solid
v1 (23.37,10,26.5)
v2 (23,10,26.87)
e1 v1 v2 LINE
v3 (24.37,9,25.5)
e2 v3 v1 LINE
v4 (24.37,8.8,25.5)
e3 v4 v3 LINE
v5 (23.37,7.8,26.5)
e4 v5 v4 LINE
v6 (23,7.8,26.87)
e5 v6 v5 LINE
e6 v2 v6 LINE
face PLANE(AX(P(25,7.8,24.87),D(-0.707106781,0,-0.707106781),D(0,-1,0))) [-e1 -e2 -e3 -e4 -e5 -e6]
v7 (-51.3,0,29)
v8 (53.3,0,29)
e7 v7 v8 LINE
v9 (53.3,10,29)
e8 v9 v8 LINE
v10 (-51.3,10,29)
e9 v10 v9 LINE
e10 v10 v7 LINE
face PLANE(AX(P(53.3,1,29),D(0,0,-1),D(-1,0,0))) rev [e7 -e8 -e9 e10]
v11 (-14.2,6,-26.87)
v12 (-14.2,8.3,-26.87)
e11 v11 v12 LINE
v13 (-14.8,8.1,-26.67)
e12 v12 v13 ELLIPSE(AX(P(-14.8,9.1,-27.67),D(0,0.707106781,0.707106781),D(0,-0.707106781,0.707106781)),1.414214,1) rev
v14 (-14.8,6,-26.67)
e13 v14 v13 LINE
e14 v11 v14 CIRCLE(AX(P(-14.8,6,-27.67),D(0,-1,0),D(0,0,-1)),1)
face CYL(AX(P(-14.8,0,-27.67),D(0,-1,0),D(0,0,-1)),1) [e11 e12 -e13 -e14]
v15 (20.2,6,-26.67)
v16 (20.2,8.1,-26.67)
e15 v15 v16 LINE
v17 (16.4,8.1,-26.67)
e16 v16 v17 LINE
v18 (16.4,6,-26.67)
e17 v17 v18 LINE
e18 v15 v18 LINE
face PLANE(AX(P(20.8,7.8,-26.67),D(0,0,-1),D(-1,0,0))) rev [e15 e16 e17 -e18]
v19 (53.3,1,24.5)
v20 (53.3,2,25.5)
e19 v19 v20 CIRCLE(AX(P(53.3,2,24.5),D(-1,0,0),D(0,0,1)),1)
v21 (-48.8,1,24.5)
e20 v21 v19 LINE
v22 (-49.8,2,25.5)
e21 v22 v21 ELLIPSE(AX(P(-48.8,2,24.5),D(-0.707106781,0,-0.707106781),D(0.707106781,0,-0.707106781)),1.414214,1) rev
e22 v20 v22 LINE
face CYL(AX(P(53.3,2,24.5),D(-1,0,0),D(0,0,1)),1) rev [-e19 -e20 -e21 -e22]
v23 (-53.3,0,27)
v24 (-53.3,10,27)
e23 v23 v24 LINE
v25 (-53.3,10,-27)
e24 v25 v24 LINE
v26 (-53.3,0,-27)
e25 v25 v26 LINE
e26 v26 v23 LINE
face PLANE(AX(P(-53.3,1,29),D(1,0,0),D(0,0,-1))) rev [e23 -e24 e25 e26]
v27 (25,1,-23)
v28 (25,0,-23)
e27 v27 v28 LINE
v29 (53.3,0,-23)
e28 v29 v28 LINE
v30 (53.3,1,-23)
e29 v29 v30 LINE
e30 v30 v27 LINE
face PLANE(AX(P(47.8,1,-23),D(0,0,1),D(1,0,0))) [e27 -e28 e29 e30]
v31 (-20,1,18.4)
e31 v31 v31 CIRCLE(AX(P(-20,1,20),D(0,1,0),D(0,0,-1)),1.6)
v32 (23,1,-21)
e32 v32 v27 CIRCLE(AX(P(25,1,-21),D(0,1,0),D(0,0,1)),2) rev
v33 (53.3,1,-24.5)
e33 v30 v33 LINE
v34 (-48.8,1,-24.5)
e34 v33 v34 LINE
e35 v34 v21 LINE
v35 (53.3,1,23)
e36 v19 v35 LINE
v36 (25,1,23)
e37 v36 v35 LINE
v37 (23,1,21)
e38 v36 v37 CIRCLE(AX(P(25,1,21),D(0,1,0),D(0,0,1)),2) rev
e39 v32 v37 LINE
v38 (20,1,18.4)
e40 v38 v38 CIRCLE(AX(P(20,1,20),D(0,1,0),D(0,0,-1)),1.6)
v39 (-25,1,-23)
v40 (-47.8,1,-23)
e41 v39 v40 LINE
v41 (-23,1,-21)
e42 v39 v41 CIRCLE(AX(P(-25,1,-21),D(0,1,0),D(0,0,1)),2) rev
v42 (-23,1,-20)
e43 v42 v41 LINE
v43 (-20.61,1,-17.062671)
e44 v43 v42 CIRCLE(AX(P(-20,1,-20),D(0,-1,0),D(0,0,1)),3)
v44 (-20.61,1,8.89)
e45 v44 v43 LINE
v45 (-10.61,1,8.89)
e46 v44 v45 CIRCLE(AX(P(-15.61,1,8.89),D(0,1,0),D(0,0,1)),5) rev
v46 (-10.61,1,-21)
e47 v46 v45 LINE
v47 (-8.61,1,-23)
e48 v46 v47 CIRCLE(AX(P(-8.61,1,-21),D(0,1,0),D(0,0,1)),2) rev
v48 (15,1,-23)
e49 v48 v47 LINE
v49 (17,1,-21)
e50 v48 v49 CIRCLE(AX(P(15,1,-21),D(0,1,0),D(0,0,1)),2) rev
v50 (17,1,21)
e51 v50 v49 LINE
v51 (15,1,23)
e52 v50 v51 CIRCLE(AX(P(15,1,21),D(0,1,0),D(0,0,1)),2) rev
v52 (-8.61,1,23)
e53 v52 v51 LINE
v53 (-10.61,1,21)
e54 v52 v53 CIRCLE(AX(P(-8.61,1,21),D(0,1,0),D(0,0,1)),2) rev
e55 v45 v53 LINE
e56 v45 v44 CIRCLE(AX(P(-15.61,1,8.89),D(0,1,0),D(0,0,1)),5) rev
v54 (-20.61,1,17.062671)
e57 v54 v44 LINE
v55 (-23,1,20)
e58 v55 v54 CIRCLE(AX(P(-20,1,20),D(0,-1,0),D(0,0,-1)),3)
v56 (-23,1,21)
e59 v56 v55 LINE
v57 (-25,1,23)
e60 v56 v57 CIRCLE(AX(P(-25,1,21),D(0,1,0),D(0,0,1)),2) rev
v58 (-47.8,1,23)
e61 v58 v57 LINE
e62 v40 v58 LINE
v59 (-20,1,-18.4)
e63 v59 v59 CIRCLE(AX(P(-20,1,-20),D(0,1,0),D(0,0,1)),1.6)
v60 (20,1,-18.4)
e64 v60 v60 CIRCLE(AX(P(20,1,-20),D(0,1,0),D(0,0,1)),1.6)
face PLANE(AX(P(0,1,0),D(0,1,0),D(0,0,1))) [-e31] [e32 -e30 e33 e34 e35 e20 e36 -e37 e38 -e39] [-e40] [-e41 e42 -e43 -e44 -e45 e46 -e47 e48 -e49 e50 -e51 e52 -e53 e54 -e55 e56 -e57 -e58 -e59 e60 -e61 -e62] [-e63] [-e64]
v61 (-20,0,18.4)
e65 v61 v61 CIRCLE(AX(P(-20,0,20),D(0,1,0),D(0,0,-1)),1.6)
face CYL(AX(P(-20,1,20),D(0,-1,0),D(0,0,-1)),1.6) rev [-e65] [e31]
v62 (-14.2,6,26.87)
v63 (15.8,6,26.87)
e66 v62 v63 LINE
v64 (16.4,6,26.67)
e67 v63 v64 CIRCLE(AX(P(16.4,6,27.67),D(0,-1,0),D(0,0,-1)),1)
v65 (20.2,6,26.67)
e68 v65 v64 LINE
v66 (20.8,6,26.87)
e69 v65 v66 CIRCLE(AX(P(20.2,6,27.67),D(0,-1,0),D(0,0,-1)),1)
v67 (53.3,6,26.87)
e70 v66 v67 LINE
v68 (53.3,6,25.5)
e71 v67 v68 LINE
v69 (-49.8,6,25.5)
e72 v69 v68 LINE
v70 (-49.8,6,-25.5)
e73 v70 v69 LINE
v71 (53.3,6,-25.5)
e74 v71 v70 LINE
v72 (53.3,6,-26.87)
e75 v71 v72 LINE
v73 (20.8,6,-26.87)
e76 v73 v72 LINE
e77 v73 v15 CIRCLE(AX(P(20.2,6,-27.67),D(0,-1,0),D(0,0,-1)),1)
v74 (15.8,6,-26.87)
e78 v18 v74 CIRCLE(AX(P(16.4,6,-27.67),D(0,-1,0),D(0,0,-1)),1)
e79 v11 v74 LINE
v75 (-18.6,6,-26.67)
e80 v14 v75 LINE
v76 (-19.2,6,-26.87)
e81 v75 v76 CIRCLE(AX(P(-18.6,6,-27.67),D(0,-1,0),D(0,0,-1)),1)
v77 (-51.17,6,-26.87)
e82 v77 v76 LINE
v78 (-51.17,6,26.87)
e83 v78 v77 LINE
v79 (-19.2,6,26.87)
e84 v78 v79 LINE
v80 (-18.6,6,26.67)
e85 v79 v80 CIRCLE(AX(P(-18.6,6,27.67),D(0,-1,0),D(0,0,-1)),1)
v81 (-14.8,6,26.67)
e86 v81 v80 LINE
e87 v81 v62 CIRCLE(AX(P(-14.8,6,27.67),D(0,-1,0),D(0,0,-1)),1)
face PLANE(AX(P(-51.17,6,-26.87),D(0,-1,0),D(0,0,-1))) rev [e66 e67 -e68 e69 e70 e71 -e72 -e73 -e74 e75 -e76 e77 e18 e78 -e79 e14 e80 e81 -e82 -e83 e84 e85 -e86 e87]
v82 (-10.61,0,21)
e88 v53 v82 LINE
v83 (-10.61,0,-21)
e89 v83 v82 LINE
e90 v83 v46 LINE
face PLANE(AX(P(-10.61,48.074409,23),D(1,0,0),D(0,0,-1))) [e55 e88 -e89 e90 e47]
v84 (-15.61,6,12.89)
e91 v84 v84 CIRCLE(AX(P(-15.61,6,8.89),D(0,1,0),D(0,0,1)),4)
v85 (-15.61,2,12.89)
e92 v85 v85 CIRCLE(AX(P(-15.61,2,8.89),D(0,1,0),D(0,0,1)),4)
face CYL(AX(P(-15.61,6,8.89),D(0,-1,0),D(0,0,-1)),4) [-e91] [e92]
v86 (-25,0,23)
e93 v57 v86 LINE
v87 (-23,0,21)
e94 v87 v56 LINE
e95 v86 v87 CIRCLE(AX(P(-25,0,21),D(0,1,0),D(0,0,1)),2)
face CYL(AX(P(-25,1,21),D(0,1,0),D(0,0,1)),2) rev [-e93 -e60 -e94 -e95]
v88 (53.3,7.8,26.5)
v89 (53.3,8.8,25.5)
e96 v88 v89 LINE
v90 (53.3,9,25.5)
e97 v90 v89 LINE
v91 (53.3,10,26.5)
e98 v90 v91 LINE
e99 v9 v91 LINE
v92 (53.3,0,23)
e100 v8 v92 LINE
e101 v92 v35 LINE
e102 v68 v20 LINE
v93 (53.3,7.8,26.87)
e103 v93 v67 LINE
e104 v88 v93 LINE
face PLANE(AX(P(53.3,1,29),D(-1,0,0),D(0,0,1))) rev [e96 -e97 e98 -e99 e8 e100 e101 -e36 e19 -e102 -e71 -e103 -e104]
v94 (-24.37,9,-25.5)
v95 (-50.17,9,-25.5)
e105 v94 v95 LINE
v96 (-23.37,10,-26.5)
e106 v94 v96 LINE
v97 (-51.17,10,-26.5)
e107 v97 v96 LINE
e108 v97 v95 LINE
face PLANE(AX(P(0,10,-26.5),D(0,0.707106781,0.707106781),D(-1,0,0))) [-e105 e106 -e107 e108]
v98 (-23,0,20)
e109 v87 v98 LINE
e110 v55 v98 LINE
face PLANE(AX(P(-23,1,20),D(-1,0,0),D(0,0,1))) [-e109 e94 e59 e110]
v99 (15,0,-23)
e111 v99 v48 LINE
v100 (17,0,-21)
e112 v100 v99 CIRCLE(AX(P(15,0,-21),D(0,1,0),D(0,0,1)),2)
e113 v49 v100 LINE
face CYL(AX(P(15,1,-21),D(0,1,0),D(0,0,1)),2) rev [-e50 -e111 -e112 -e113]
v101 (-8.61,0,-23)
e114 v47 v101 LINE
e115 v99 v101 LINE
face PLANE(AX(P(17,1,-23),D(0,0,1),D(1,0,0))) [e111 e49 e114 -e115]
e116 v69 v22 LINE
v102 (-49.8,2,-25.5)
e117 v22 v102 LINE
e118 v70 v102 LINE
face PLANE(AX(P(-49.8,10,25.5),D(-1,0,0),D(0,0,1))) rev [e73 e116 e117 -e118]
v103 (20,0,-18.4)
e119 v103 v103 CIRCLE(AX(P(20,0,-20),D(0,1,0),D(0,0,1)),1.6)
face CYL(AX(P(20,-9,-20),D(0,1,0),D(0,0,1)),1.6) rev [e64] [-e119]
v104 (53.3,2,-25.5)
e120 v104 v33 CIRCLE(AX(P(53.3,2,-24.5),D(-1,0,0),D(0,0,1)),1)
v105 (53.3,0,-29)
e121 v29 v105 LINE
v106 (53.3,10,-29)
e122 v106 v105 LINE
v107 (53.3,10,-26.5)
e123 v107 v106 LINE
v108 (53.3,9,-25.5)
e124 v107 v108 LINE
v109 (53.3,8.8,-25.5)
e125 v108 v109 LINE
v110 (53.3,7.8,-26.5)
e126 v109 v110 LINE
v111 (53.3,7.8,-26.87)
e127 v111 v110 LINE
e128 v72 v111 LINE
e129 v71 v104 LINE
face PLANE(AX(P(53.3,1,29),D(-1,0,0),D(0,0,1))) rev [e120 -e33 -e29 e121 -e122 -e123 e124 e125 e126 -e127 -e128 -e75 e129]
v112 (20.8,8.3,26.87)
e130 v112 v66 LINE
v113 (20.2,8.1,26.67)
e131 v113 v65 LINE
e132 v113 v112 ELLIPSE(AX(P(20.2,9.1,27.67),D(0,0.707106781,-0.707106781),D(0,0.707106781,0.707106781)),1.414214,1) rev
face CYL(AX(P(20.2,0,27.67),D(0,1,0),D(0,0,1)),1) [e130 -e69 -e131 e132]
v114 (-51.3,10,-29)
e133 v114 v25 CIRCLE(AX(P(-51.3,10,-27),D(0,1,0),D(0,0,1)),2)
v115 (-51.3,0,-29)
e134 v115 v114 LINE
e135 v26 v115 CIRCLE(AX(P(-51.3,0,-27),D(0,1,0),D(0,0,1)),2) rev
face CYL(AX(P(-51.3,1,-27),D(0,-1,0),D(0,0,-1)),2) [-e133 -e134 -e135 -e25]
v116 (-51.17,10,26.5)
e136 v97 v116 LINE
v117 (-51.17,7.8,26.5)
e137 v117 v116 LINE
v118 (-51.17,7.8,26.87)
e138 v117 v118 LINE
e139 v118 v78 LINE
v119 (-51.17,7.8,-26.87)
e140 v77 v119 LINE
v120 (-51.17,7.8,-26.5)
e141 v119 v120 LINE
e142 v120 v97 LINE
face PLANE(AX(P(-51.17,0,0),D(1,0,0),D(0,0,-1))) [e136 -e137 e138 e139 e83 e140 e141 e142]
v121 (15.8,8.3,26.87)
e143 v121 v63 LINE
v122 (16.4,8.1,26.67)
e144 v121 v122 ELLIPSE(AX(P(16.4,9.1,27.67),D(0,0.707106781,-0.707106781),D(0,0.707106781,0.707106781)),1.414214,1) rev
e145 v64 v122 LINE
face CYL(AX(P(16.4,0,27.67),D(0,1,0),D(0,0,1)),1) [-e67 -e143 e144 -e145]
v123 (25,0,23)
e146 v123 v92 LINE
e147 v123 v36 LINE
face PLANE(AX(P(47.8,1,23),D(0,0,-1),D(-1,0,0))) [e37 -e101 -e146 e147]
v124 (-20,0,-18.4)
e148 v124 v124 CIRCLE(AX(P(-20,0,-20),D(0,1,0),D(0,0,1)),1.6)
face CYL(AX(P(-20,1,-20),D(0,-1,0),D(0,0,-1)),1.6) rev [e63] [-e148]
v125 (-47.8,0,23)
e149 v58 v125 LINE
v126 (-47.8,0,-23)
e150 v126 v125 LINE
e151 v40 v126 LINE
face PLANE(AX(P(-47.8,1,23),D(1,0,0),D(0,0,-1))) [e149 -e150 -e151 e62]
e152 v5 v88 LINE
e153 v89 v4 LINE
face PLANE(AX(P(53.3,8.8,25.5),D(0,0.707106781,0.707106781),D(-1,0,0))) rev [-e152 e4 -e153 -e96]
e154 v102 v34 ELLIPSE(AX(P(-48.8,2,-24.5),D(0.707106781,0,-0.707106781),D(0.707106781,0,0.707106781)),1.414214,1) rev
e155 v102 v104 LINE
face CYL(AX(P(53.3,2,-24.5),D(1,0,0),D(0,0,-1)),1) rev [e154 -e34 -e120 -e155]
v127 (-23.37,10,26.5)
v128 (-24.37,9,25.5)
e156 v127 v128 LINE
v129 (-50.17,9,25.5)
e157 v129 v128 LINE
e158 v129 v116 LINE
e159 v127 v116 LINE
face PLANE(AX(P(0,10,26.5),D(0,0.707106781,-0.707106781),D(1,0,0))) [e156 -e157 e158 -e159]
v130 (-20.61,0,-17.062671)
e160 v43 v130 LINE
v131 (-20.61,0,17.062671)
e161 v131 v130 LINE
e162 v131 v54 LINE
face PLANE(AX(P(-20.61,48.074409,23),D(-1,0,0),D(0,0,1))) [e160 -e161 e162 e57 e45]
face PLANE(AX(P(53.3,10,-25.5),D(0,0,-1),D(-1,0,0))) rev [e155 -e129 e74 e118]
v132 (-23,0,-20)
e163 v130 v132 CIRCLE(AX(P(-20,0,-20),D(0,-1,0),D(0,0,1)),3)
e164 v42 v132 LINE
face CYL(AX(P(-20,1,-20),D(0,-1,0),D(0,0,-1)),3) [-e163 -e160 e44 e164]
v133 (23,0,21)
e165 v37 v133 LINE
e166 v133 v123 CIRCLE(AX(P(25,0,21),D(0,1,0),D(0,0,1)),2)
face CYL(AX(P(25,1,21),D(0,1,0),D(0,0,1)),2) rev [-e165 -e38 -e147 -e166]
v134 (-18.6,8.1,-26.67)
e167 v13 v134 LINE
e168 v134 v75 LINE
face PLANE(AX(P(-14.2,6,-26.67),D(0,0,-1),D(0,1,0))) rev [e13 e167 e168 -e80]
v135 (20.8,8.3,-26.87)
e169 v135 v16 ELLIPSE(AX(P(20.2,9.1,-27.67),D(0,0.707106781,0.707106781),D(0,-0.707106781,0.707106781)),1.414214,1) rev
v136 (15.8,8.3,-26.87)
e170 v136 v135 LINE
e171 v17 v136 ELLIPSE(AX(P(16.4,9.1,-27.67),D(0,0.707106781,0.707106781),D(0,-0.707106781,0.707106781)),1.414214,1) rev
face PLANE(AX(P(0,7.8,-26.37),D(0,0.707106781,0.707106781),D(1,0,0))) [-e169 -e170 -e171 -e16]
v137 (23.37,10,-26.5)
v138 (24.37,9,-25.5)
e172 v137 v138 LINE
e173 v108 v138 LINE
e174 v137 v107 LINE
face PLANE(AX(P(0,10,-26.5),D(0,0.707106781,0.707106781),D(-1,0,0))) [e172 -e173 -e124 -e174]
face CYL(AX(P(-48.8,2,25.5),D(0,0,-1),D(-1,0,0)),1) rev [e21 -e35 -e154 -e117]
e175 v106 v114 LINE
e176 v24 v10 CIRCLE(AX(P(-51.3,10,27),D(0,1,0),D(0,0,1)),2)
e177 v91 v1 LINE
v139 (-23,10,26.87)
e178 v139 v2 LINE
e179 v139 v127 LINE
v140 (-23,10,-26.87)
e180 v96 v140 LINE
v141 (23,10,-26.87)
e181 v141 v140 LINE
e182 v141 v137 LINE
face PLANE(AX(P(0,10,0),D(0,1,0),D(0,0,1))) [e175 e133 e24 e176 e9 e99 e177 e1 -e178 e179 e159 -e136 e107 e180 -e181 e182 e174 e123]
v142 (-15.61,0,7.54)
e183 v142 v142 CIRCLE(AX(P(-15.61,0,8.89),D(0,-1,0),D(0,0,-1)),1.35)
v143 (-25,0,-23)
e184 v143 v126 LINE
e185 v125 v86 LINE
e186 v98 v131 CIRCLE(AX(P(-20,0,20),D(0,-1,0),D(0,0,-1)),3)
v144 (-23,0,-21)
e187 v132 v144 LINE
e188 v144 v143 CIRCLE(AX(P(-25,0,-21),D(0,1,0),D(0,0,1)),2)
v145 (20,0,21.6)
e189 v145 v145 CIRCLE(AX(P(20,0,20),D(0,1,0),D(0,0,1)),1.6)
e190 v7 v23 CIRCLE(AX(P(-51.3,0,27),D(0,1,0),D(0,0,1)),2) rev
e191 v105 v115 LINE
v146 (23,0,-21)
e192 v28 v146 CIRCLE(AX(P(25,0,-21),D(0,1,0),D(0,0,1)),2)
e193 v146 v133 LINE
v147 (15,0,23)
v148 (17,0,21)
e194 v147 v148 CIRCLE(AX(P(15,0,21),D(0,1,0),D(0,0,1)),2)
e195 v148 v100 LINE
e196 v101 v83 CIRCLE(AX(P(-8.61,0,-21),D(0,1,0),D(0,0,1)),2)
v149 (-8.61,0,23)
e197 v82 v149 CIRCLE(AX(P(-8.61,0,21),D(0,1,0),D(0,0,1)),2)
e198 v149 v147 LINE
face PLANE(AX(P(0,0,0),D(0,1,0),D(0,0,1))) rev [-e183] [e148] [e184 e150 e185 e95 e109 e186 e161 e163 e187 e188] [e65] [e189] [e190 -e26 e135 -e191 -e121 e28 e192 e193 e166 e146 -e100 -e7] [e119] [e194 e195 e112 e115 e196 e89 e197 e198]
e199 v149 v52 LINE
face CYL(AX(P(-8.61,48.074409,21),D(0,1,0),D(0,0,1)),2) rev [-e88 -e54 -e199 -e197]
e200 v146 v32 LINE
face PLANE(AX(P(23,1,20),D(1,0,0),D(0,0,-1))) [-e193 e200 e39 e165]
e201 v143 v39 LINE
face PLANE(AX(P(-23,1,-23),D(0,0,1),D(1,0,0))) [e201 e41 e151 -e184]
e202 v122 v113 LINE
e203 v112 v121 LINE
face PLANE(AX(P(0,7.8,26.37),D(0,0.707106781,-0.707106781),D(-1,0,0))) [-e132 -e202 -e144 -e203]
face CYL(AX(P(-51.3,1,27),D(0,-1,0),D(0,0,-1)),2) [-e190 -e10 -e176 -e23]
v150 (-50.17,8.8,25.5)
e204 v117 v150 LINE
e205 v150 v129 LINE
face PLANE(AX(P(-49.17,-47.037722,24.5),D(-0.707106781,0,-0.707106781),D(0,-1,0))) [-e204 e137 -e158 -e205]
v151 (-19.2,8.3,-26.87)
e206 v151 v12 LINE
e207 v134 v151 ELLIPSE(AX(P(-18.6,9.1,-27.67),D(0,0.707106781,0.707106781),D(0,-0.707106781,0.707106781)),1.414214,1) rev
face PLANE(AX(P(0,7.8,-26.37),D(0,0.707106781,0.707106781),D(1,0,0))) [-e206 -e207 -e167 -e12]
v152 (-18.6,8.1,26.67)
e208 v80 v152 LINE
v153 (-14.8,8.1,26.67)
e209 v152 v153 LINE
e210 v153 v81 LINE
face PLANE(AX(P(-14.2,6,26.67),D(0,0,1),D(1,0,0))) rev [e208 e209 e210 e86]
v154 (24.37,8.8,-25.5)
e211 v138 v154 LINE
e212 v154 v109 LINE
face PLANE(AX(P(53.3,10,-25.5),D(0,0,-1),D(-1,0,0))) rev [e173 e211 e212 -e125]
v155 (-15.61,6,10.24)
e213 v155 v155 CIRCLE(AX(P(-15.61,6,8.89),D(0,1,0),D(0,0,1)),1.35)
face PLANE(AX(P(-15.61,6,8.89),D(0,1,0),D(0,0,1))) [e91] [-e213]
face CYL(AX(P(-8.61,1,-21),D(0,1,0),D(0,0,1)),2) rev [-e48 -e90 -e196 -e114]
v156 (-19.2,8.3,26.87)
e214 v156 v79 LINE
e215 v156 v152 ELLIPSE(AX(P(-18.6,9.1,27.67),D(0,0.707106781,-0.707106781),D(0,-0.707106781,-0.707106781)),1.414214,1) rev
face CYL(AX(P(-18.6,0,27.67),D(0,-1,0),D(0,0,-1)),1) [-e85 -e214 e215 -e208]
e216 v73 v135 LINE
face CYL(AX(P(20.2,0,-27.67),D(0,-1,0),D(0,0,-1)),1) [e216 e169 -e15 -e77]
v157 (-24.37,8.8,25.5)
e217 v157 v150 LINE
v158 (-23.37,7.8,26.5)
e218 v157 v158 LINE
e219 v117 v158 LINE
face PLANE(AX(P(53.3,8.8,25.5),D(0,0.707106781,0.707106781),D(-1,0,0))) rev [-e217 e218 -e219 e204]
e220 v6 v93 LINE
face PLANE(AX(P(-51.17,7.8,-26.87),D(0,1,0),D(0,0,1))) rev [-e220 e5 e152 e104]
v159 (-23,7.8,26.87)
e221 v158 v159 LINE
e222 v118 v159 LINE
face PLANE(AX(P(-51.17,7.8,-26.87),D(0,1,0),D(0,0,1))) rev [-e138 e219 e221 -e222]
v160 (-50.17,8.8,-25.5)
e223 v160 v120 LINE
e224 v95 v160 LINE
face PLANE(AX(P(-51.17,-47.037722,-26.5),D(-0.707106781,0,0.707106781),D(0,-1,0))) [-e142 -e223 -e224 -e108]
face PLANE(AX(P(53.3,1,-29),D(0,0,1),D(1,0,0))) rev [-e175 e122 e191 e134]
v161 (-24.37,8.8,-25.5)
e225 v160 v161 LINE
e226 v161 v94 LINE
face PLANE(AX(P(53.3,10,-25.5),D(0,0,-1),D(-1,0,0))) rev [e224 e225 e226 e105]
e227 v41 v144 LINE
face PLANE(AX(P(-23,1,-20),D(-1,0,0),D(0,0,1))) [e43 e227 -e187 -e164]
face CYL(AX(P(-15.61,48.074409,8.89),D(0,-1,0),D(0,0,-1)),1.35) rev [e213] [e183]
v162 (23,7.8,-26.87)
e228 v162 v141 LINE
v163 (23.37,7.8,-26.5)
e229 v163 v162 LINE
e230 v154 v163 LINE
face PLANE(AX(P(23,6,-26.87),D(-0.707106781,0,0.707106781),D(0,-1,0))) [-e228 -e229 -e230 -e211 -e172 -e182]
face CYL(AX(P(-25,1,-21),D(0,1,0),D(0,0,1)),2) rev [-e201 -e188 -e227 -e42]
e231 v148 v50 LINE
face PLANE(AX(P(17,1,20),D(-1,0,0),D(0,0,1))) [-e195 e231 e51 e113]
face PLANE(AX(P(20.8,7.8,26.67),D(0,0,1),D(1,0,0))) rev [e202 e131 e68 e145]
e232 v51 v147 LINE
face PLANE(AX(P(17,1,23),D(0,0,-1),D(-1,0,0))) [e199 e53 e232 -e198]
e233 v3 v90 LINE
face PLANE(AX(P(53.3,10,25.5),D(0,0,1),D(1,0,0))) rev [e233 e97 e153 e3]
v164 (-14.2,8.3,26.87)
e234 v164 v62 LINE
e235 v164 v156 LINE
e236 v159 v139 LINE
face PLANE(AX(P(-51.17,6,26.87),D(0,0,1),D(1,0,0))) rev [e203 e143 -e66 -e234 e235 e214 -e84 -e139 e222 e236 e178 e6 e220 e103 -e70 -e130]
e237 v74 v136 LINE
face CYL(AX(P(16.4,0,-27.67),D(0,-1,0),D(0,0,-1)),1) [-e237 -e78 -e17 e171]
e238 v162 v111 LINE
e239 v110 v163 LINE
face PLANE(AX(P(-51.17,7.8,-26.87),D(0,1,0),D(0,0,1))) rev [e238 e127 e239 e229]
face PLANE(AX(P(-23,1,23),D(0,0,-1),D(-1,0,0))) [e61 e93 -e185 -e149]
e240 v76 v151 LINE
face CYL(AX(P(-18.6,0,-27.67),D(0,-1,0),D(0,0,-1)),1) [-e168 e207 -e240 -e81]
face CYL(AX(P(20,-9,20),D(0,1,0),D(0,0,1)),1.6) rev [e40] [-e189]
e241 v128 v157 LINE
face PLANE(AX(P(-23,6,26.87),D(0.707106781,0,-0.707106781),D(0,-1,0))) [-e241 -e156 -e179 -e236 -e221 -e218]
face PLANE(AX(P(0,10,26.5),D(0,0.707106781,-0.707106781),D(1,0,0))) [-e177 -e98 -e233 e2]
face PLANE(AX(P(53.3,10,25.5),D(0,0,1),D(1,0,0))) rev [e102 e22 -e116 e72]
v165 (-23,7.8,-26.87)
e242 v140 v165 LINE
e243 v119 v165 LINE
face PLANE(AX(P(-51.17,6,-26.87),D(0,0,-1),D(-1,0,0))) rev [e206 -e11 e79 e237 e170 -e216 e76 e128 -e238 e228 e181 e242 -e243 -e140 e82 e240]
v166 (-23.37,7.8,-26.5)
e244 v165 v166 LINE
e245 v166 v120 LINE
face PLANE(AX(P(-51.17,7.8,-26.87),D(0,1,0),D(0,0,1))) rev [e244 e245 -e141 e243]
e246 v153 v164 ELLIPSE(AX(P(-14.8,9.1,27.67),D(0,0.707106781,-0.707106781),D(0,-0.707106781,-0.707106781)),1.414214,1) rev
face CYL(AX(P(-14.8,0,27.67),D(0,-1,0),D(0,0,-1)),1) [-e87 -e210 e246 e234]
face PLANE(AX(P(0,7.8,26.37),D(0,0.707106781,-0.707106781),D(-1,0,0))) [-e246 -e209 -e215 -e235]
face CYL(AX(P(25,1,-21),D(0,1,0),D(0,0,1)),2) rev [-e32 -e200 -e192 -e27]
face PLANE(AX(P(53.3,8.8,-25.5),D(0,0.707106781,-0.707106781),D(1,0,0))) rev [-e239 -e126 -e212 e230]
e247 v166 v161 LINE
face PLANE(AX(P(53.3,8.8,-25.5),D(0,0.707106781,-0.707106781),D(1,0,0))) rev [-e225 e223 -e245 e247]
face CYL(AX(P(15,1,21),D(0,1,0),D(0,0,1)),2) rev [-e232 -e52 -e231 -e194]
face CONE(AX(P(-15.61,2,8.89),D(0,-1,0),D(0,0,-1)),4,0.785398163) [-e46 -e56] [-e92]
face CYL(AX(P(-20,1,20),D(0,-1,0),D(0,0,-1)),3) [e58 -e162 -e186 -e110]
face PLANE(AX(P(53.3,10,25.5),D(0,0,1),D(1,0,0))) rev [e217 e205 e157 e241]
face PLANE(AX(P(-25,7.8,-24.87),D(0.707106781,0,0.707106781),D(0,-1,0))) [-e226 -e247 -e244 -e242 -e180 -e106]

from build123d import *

# Parameters (mm, degrees)
CROQUIS1_W              = 106.6
CROQUIS1_H              = 58
CROQUIS1_R              = 1.6
SALIENTE_EXTRUIR1_DEPTH = 1
REDONDEO1_R             = 2
SALIENTE_EXTRUIR2_DEPTH = 9
CROQUIS3_W              = 53.74
CROQUIS3_H              = 1.8
CORTAR_EXTRUIR2_DEPTH   = 104.47
CROQUIS10_W             = 1.37
CROQUIS10_H             = 51
CORTAR_EXTRUIR4_DEPTH   = 4
CHAFL_N1_SIZE           = 1
CROQUIS5_W              = 0.2
CROQUIS5_H              = 1.8
SALIENTE_EXTRUIR4_DEPTH = 2.5
CROQUIS4_W              = 0.2
CROQUIS4_H              = 1.8
SALIENTE_EXTRUIR3_DEPTH = 2.5
REDONDEO5_R             = 2
CROQUIS6_W              = 10
CROQUIS6_H              = 46
CROQUIS6_R              = 1.35
CROQUIS6_W_2            = 6
SALIENTE_EXTRUIR5_DEPTH = 1
REDONDEO6_R             = 2
CROQUIS7_R              = 4
CROQUIS7_R_2            = 1.35
SALIENTE_EXTRUIR6_DEPTH = 5
CHAFL_N2_SIZE           = 1
REDONDEO4_R             = 1
CORTAR_EXTRUIR3_START   = -2.2
CROQUIS9_W              = 50
CROQUIS9_H              = 53.74
CORTAR_EXTRUIR3_DEPTH   = 2.2
CORTAR_EXTRUIR5_START   = -10
CROQUIS11_R             = 1.6
CROQUIS11_W             = 5.5
CROQUIS11_H             = 46
CORTAR_EXTRUIR5_DEPTH   = 10
REDONDEO7_R             = 1
CORTAR_EXTRUIR6_START   = -2.2
CROQUIS12_W             = 2
CROQUIS12_H             = 53
CORTAR_EXTRUIR6_DEPTH   = 2.2
CHAFL_N6_SIZE           = 2
CHAFL_N8_START          = 7.8
CHAFL_N8_DEPTH          = 0.5
CHAFL_N8_START_2        = -20
CHAFL_N8_2_DEPTH        = 42


with BuildPart() as part:
    # Croquis1 → Saliente-Extruir1 (new body)
    with BuildSketch(Plane(origin=(0, 0, 0), x_dir=(1, 0, 0), z_dir=(0, 1, 0))):
        Rectangle(CROQUIS1_W, CROQUIS1_H)
        with Locations(Location((-20, 20, 0), (0, 0, 270))):
            Circle(CROQUIS1_R, mode=Mode.SUBTRACT)
        with Locations(Location((20, 20, 0), (0, 0, 90))):
            Circle(CROQUIS1_R, mode=Mode.SUBTRACT)
        with Locations(Location((20, -20, 0), (0, 0, 270))):
            Circle(CROQUIS1_R, mode=Mode.SUBTRACT)
        with Locations(Location((-20, -20, 0), (0, 0, 90))):
            Circle(CROQUIS1_R, mode=Mode.SUBTRACT)
        with BuildLine():
            Line((-23, 20), (-23, 23))
            Line((-23, 23), (-47.8, 23))
            Line((-47.8, 23), (-47.8, -23))
            Line((-47.8, -23), (-23, -23))
            Line((-23, -23), (-23, -20))
            ThreePointArc((-23, -20), (-20, -17), (-17, -20))
            Line((-17, -20), (-17, -23))
            Line((-17, -23), (17, -23))
            Line((17, -23), (17, -20))
            ThreePointArc((17, -20), (20, -17), (23, -20))
            Line((23, -20), (23, -23))
            Line((23, -23), (47.8, -23))
            Line((47.8, -23), (47.8, 23))
            Line((47.8, 23), (23, 23))
            Line((23, 23), (23, 20))
            ThreePointArc((23, 20), (20, 17), (17, 20))
            Line((17, 20), (17, 23))
            Line((17, 23), (-17, 23))
            Line((-17, 23), (-17, 20))
            ThreePointArc((-17, 20), (-20, 17), (-23, 20))
        make_face(mode=Mode.SUBTRACT)
    extrude(amount=SALIENTE_EXTRUIR1_DEPTH)

    # Redondeo1
    redondeo1_edges = [part.edges().sort_by_distance(p)[0] for p in [
        (-23, 0.5, -23),
        (-23, 0.5, 23),
        (-17, 0.5, 23),
        (17, 0.5, 23),
        (23, 0.5, 23),
        (23, 0.5, -23),
        (17, 0.5, -23),
        (-17, 0.5, -23),
    ]]
    fillet(redondeo1_edges, radius=REDONDEO1_R)

    # Croquis2 → Saliente-Extruir2 (add)
    with BuildSketch(Plane(origin=(0, 1, 0), x_dir=(1, 0, 0), z_dir=(0, 1, 0))):
        Polygon((53.3, -25.5), (53.3, -29), (-53.3, -29), (-53.3, 29), (53.3, 29), (53.3, 25.5), (-49.8, 25.5), (-49.8, -25.5), align=None)
    extrude(amount=SALIENTE_EXTRUIR2_DEPTH)

    # Croquis3 → Cortar-Extruir2 (cut)
    with BuildSketch(Plane(origin=(53.3, 0, 0), x_dir=(0, 0, -1), z_dir=(1, 0, 0))):
        with Locations((0, 6.9)):
            Rectangle(CROQUIS3_W, CROQUIS3_H)
    extrude(amount=-CORTAR_EXTRUIR2_DEPTH, mode=Mode.SUBTRACT)

    # Croquis10 → Cortar-Extruir4 (cut)
    with BuildSketch(Plane(origin=(0, 10, 0), x_dir=(1, 0, 0), z_dir=(0, 1, 0))):
        with Locations((-50.485, 0)):
            Rectangle(CROQUIS10_W, CROQUIS10_H)
    extrude(amount=-CORTAR_EXTRUIR4_DEPTH, mode=Mode.SUBTRACT)

    # Chaflán1
    chafl_n1_edges = [part.edges().sort_by_distance(p)[0] for p in [
        (1.065, 10, 25.5),
        (1.065, 10, -25.5),
        (1.065, 7.8, -25.5),
        (1.065, 7.8, 25.5),
    ]]
    chamfer(chafl_n1_edges, length=CHAFL_N1_SIZE)

    # Croquis5 → Saliente-Extruir4 (add, symmetric)
    with BuildSketch(Plane(origin=(-16.7, 0, 0), x_dir=(0, 0, -1), z_dir=(1, 0, 0))):
        with Locations((26.77, 6.9)):
            Rectangle(CROQUIS5_W, CROQUIS5_H)
        with Locations((-26.77, 6.9)):
            Rectangle(CROQUIS5_W, CROQUIS5_H)
    extrude(amount=SALIENTE_EXTRUIR4_DEPTH, both=True)

    # Croquis4 → Saliente-Extruir3 (add, symmetric)
    with BuildSketch(Plane(origin=(18.3, 0, 0), x_dir=(0, 0, -1), z_dir=(1, 0, 0))):
        with Locations((-26.77, 6.9)):
            Rectangle(CROQUIS4_W, CROQUIS4_H)
        with Locations((26.77, 6.9)):
            Rectangle(CROQUIS4_W, CROQUIS4_H)
    extrude(amount=SALIENTE_EXTRUIR3_DEPTH, both=True)

    # Redondeo5
    redondeo5_edges = [part.edges().sort_by_distance(p)[0] for p in [
        (-53.3, 5, -29),
        (-53.3, 5, 29),
    ]]
    fillet(redondeo5_edges, radius=REDONDEO5_R)

    # Croquis6 → Saliente-Extruir5 (add)
    # profile 1 of 2: a face of its own
    with BuildSketch(Plane.XZ):
        with Locations((-15.61, 0)):
            Rectangle(CROQUIS6_W, CROQUIS6_H)
        with Locations(Location((-15.61, 8.89, 0), (0, 0, 270))):
            Circle(CROQUIS6_R, mode=Mode.SUBTRACT)
    # profile 2 of 2: a face of its own
    with BuildSketch(Plane.XZ):
        with Locations((20, 0)):
            Rectangle(CROQUIS6_W_2, CROQUIS6_H)
    extrude(amount=-SALIENTE_EXTRUIR5_DEPTH)

    # Redondeo6
    redondeo6_edges = [part.edges().sort_by_distance(p)[0] for p in [
        (-10.61, 0.5, -23),
        (-10.61, 0.5, 23),
    ]]
    fillet(redondeo6_edges, radius=REDONDEO6_R)

    # Croquis7 → Saliente-Extruir6 (add)
    with BuildSketch(Plane(origin=(0, 1, 0), x_dir=(1, 0, 0), z_dir=(0, 1, 0))):
        with Locations(Location((-15.61, -8.89, 0), (0, 0, 270))):
            Circle(CROQUIS7_R)
        with Locations(Location((-15.61, -8.89, 0), (0, 0, 90))):
            Circle(CROQUIS7_R_2, mode=Mode.SUBTRACT)
    extrude(amount=SALIENTE_EXTRUIR6_DEPTH)

    # Chaflán2
    chafl_n2_edges = [part.edges().sort_by_distance(p)[0] for p in [
        (-15.61, 1, 4.89),
    ]]
    chamfer(chafl_n2_edges, length=CHAFL_N2_SIZE - 0.0001)  # a hair under: the kernel refuses the full size

    # Redondeo4
    # the kernel refuses this fillet: 1 mm, written as the material it takes off along each edge
    with BuildSketch(Plane(origin=(15.8, 6, 26.67), x_dir=(0, 0, 1), z_dir=(0, 1, 0)), Plane(origin=(-19.2, 6, 26.67), x_dir=(0, 0, 1), z_dir=(0, 1, 0)), Plane(origin=(15.8, 7.8, -26.67), x_dir=(0, 0, -1), z_dir=(0, -1, 0))) as redondeo4_piece_1:
        with BuildLine():
            CenterArc((1, 0.6), REDONDEO4_R, 180, 36.869897646)
            Line((0, 0.6), (-0.02, 0.6))
            Line((-0.02, 0.6), (-0.02, 0))
            Line((-0.02, 0), (0, -0.02))
            ThreePointArc((0, -0.02), (0.1, -0.02), (0.184, -0.012))
            Line((0.184, -0.012), (0.2, 0))
        make_face()
    extrude(amount=1.8, mode=Mode.SUBTRACT)
    with BuildSketch(Plane(origin=(20.8, 6, 26.67), x_dir=(-1, 0, 0), z_dir=(0, 1, 0)), Plane(origin=(-14.2, 6, 26.67), x_dir=(-1, 0, 0), z_dir=(0, 1, 0)), Plane(origin=(20.8, 7.8, -26.67), x_dir=(-1, 0, 0), z_dir=(0, -1, 0))) as redondeo4_piece_2:
        with BuildLine():
            CenterArc((0.6, 1), REDONDEO4_R, 233.130102354, 36.869897646)
            Line((0, 0.2), (-0.012, 0.184))
            ThreePointArc((-0.012, 0.184), (-0.02, 0.1), (-0.02, 0))
            Line((-0.02, 0), (0, -0.02))
            Line((0, -0.02), (0.6, -0.02))
            Line((0.6, -0.02), (0.6, 0))
        make_face()
    extrude(amount=1.8, mode=Mode.SUBTRACT)
    with BuildSketch(Plane(origin=(-14.2, 6, -26.67), x_dir=(-1, 0, 0), z_dir=(0, 1, 0))) as redondeo4_piece_3:
        with BuildLine():
            CenterArc((0.6, -1), REDONDEO4_R, 90, 36.869897646)
            Line((0, -0.2), (-0.012, -0.184))
            ThreePointArc((-0.012, -0.184), (-0.02, -0.1), (-0.02, 0))
            Line((-0.02, 0), (0, 0.02))
            Line((0, 0.02), (0.6, 0.02))
            Line((0.6, 0.02), (0.6, 0))
        make_face()
    extrude(amount=1.8, mode=Mode.SUBTRACT)
    with BuildSketch(Plane(origin=(-19.2, 6, -26.67), x_dir=(0, 0, -1), z_dir=(0, 1, 0))) as redondeo4_piece_4:
        with BuildLine():
            CenterArc((1, -0.6), REDONDEO4_R, 143.130102354, 36.869897646)
            Line((0, -0.6), (-0.02, -0.6))
            Line((-0.02, -0.6), (-0.02, 0))
            Line((-0.02, 0), (0, 0.02))
            ThreePointArc((0, 0.02), (0.1, 0.02), (0.184, 0.012))
            Line((0.184, 0.012), (0.2, 0))
        make_face()
    extrude(amount=1.8, mode=Mode.SUBTRACT)

    # Croquis9 → Cortar-Extruir3 (cut)
    with BuildSketch(Plane(origin=(0, 10, 0), x_dir=(1, 0, 0), z_dir=(0, 1, 0)).offset(CORTAR_EXTRUIR3_START)):
        Rectangle(CROQUIS9_W, CROQUIS9_H)
    extrude(amount=CORTAR_EXTRUIR3_DEPTH, mode=Mode.SUBTRACT)

    # Croquis11 → Cortar-Extruir5 (cut)
    with BuildSketch(Plane(origin=(0, 1, 0), x_dir=(1, 0, 0), z_dir=(0, 1, 0)).offset(CORTAR_EXTRUIR5_START)):
        with Locations(Location((-20, 20, 0), (0, 0, 270))):
            Circle(CROQUIS11_R)
        with Locations(Location((20, -20, 0), (0, 0, 270))):
            Circle(CROQUIS11_R)
        with Locations(Location((20, 20, 0), (0, 0, 270))):
            Circle(CROQUIS11_R)
        with Locations(Location((-20, -20, 0), (0, 0, 90))):
            Circle(CROQUIS11_R)
        with Locations((50.55, 0)):
            Rectangle(CROQUIS11_W, CROQUIS11_H)
    extrude(amount=CORTAR_EXTRUIR5_DEPTH, mode=Mode.SUBTRACT)

    # Redondeo7
    redondeo7_edges = [part.edges().sort_by_distance(p)[0] for p in [
        (1.75, 1, 25.5),
        (-49.8, 1, 0),
        (1.75, 1, -25.5),
    ]]
    fillet(redondeo7_edges, radius=REDONDEO7_R)

    # Croquis12 → Cortar-Extruir6 (cut)
    with BuildSketch(Plane(origin=(0, 10, 0), x_dir=(1, 0, 0), z_dir=(0, 1, 0)).offset(CORTAR_EXTRUIR6_START)):
        with Locations((-50.17, 0)):
            Rectangle(CROQUIS12_W, CROQUIS12_H)
    extrude(amount=CORTAR_EXTRUIR6_DEPTH, mode=Mode.SUBTRACT)

    # Chaflán6
    # the kernel refuses this chamfer: 2 mm, written as the material it adds along each edge
    with BuildSketch(Plane(origin=(-49.17, 2.656634024, 26.5), x_dir=(-1, 0, 0), z_dir=(0, 1, 0))) as chafl_n6_piece_1_section:
        Polygon((CHAFL_N6_SIZE, 0), (0, -CHAFL_N6_SIZE), (0, 0), align=None)
    chafl_n6_piece_1 = extrude(amount=12.486731952, mode=Mode.PRIVATE)
    chafl_n6_piece_1 = split(chafl_n6_piece_1, bisect_by=Plane(origin=(-49.17, 2.656634024, 25.5), z_dir=(0, 0, 1)), keep=Keep.TOP, mode=Mode.PRIVATE)
    chafl_n6_piece_1 = split(chafl_n6_piece_1, bisect_by=Plane(origin=(-49.17, 6.328317012, 22.828317012), z_dir=(0, -0.7071067811865476, 0.7071067811865476)), keep=Keep.TOP, mode=Mode.PRIVATE)
    chafl_n6_piece_1 = split(chafl_n6_piece_1, bisect_by=Plane(origin=(-49.17, 5.228317012, 29.071682988), z_dir=(0, 0.7071067811865476, 0.7071067811865476)), keep=Keep.TOP, mode=Mode.PRIVATE)
    add(chafl_n6_piece_1)
    with BuildSketch(Plane(origin=(-49.17, 2.656634024, -26.5), x_dir=(-1, 0, 0), z_dir=(0, 1, 0))) as chafl_n6_piece_2_section:
        Polygon((CHAFL_N6_SIZE, 0), (0, CHAFL_N6_SIZE), (0, 0), align=None)
    chafl_n6_piece_2 = extrude(amount=12.486731952, mode=Mode.PRIVATE)
    chafl_n6_piece_2 = split(chafl_n6_piece_2, bisect_by=Plane(origin=(-49.17, 2.656634024, -25.5), z_dir=(0, 0, -1)), keep=Keep.TOP, mode=Mode.PRIVATE)
    chafl_n6_piece_2 = split(chafl_n6_piece_2, bisect_by=Plane(origin=(-49.17, 6.328317012, -22.828317012), z_dir=(0, -0.7071067811865476, -0.7071067811865476)), keep=Keep.TOP, mode=Mode.PRIVATE)
    chafl_n6_piece_2 = split(chafl_n6_piece_2, bisect_by=Plane(origin=(-49.17, 5.228317012, -29.071682988), z_dir=(0, 0.7071067811865471, -0.7071067811865479)), keep=Keep.TOP, mode=Mode.PRIVATE)
    add(chafl_n6_piece_2)
    with BuildSketch(Plane(origin=(25, 7.8, 26.87), x_dir=(-1, 0, 0), z_dir=(0, 1, 0))) as chafl_n6_piece_3_section:
        Polygon((CHAFL_N6_SIZE, 0), (0, -CHAFL_N6_SIZE), (0, 0), align=None)
    chafl_n6_piece_3 = extrude(amount=2.2, mode=Mode.PRIVATE)
    chafl_n6_piece_3 = split(chafl_n6_piece_3, bisect_by=Plane(origin=(25, 7.8, 25.5), z_dir=(0, 0, 1)), keep=Keep.TOP, mode=Mode.PRIVATE)
    chafl_n6_piece_3 = split(chafl_n6_piece_3, bisect_by=Plane(origin=(25, 7.615, 26.685), z_dir=(0, 0.7071067811865476, 0.7071067811865476)), keep=Keep.TOP, mode=Mode.PRIVATE)
    chafl_n6_piece_3 = split(chafl_n6_piece_3, bisect_by=Plane(origin=(25, 9.085, 25.585), z_dir=(0, -0.7071067811865476, 0.7071067811865476)), keep=Keep.TOP, mode=Mode.PRIVATE)
    add(chafl_n6_piece_3)
    with BuildSketch(Plane(origin=(-25, 7.8, 26.87), x_dir=(1, 0, 0), z_dir=(0, 1, 0))) as chafl_n6_piece_4_section:
        Polygon((CHAFL_N6_SIZE, 0), (0, CHAFL_N6_SIZE), (0, 0), align=None)
    chafl_n6_piece_4 = extrude(amount=2.2, mode=Mode.PRIVATE)
    chafl_n6_piece_4 = split(chafl_n6_piece_4, bisect_by=Plane(origin=(-25, 7.8, 25.5), z_dir=(0, 0, 1)), keep=Keep.TOP, mode=Mode.PRIVATE)
    chafl_n6_piece_4 = split(chafl_n6_piece_4, bisect_by=Plane(origin=(-25, 9.085, 25.585), z_dir=(0, -0.7071067811865476, 0.7071067811865476)), keep=Keep.TOP, mode=Mode.PRIVATE)
    chafl_n6_piece_4 = split(chafl_n6_piece_4, bisect_by=Plane(origin=(-25, 7.615, 26.685), z_dir=(0, 0.7071067811865476, 0.7071067811865476)), keep=Keep.TOP, mode=Mode.PRIVATE)
    add(chafl_n6_piece_4)
    with BuildSketch(Plane(origin=(25, 7.8, -26.87), x_dir=(-1, 0, 0), z_dir=(0, 1, 0))) as chafl_n6_piece_5_section:
        Polygon((CHAFL_N6_SIZE, 0), (0, CHAFL_N6_SIZE), (0, 0), align=None)
    chafl_n6_piece_5 = extrude(amount=2.2, mode=Mode.PRIVATE)
    chafl_n6_piece_5 = split(chafl_n6_piece_5, bisect_by=Plane(origin=(25, 7.8, -25.5), z_dir=(0, 0, -1)), keep=Keep.TOP, mode=Mode.PRIVATE)
    chafl_n6_piece_5 = split(chafl_n6_piece_5, bisect_by=Plane(origin=(25, 9.085, -25.585), z_dir=(0, -0.7071067811865476, -0.7071067811865476)), keep=Keep.TOP, mode=Mode.PRIVATE)
    chafl_n6_piece_5 = split(chafl_n6_piece_5, bisect_by=Plane(origin=(25, 7.615, -26.685), z_dir=(0, 0.7071067811865471, -0.7071067811865479)), keep=Keep.TOP, mode=Mode.PRIVATE)
    add(chafl_n6_piece_5)
    with BuildSketch(Plane(origin=(-25, 7.8, -26.87), x_dir=(1, 0, 0), z_dir=(0, 1, 0))) as chafl_n6_piece_6_section:
        Polygon((CHAFL_N6_SIZE, 0), (0, -CHAFL_N6_SIZE), (0, 0), align=None)
    chafl_n6_piece_6 = extrude(amount=2.2, mode=Mode.PRIVATE)
    chafl_n6_piece_6 = split(chafl_n6_piece_6, bisect_by=Plane(origin=(-25, 7.8, -25.5), z_dir=(0, 0, -1)), keep=Keep.TOP, mode=Mode.PRIVATE)
    chafl_n6_piece_6 = split(chafl_n6_piece_6, bisect_by=Plane(origin=(-25, 9.085, -25.585), z_dir=(0, -0.7071067811865476, -0.7071067811865476)), keep=Keep.TOP, mode=Mode.PRIVATE)
    chafl_n6_piece_6 = split(chafl_n6_piece_6, bisect_by=Plane(origin=(-25, 7.615, -26.685), z_dir=(0, 0.7071067811865471, -0.7071067811865479)), keep=Keep.TOP, mode=Mode.PRIVATE)
    add(chafl_n6_piece_6)

    # Chaflán8: read off the stored shape, not the designer's step
    # Chaflán8 outline → Chaflán8 (add)
    with BuildSketch(Plane(origin=(0, 0, 0), x_dir=(1, 0, 0), z_dir=(0, 1, 0)).offset(CHAFL_N8_START)):
        with BuildLine():
            ThreePointArc((16.4, -26.67), (16.083772234, -26.721316702), (15.8, -26.87))
            Line((15.8, -26.87), (20.8, -26.87))
            ThreePointArc((20.8, -26.87), (20.516227766, -26.721316702), (20.2, -26.67))
            Line((20.2, -26.67), (16.4, -26.67))
        make_face()
        with BuildLine():
            Line((-14.8, -26.67), (-18.6, -26.67))
            ThreePointArc((-18.6, -26.67), (-18.916227766, -26.721316702), (-19.2, -26.87))
            Line((-19.2, -26.87), (-14.2, -26.87))
            ThreePointArc((-14.2, -26.87), (-14.483772234, -26.721316702), (-14.8, -26.67))
        make_face()
        with BuildLine():
            Line((20.8, 26.87), (15.8, 26.87))
            ThreePointArc((15.8, 26.87), (16.083772234, 26.721316702), (16.4, 26.67))
            Line((16.4, 26.67), (20.2, 26.67))
            ThreePointArc((20.2, 26.67), (20.516227766, 26.721316702), (20.8, 26.87))
        make_face()
        with BuildLine():
            Line((-18.6, 26.67), (-14.8, 26.67))
            ThreePointArc((-14.8, 26.67), (-14.483772234, 26.721316702), (-14.2, 26.87))
            Line((-14.2, 26.87), (-19.2, 26.87))
            ThreePointArc((-19.2, 26.87), (-18.916227766, 26.721316702), (-18.6, 26.67))
        make_face()
    extrude(amount=CHAFL_N8_DEPTH)

    # Chafl_n8 2 outline → Chafl_n8 2 (cut)
    with BuildSketch(Plane.YZ.offset(CHAFL_N8_START_2)):
        Polygon((8.1, -26.67), (8.3, -26.87), (8.3, -26.67), align=None)
        Polygon((8.3, 26.87), (8.1, 26.67), (8.3, 26.67), align=None)
    extrude(amount=CHAFL_N8_2_DEPTH, mode=Mode.SUBTRACT)


solid = part.part
